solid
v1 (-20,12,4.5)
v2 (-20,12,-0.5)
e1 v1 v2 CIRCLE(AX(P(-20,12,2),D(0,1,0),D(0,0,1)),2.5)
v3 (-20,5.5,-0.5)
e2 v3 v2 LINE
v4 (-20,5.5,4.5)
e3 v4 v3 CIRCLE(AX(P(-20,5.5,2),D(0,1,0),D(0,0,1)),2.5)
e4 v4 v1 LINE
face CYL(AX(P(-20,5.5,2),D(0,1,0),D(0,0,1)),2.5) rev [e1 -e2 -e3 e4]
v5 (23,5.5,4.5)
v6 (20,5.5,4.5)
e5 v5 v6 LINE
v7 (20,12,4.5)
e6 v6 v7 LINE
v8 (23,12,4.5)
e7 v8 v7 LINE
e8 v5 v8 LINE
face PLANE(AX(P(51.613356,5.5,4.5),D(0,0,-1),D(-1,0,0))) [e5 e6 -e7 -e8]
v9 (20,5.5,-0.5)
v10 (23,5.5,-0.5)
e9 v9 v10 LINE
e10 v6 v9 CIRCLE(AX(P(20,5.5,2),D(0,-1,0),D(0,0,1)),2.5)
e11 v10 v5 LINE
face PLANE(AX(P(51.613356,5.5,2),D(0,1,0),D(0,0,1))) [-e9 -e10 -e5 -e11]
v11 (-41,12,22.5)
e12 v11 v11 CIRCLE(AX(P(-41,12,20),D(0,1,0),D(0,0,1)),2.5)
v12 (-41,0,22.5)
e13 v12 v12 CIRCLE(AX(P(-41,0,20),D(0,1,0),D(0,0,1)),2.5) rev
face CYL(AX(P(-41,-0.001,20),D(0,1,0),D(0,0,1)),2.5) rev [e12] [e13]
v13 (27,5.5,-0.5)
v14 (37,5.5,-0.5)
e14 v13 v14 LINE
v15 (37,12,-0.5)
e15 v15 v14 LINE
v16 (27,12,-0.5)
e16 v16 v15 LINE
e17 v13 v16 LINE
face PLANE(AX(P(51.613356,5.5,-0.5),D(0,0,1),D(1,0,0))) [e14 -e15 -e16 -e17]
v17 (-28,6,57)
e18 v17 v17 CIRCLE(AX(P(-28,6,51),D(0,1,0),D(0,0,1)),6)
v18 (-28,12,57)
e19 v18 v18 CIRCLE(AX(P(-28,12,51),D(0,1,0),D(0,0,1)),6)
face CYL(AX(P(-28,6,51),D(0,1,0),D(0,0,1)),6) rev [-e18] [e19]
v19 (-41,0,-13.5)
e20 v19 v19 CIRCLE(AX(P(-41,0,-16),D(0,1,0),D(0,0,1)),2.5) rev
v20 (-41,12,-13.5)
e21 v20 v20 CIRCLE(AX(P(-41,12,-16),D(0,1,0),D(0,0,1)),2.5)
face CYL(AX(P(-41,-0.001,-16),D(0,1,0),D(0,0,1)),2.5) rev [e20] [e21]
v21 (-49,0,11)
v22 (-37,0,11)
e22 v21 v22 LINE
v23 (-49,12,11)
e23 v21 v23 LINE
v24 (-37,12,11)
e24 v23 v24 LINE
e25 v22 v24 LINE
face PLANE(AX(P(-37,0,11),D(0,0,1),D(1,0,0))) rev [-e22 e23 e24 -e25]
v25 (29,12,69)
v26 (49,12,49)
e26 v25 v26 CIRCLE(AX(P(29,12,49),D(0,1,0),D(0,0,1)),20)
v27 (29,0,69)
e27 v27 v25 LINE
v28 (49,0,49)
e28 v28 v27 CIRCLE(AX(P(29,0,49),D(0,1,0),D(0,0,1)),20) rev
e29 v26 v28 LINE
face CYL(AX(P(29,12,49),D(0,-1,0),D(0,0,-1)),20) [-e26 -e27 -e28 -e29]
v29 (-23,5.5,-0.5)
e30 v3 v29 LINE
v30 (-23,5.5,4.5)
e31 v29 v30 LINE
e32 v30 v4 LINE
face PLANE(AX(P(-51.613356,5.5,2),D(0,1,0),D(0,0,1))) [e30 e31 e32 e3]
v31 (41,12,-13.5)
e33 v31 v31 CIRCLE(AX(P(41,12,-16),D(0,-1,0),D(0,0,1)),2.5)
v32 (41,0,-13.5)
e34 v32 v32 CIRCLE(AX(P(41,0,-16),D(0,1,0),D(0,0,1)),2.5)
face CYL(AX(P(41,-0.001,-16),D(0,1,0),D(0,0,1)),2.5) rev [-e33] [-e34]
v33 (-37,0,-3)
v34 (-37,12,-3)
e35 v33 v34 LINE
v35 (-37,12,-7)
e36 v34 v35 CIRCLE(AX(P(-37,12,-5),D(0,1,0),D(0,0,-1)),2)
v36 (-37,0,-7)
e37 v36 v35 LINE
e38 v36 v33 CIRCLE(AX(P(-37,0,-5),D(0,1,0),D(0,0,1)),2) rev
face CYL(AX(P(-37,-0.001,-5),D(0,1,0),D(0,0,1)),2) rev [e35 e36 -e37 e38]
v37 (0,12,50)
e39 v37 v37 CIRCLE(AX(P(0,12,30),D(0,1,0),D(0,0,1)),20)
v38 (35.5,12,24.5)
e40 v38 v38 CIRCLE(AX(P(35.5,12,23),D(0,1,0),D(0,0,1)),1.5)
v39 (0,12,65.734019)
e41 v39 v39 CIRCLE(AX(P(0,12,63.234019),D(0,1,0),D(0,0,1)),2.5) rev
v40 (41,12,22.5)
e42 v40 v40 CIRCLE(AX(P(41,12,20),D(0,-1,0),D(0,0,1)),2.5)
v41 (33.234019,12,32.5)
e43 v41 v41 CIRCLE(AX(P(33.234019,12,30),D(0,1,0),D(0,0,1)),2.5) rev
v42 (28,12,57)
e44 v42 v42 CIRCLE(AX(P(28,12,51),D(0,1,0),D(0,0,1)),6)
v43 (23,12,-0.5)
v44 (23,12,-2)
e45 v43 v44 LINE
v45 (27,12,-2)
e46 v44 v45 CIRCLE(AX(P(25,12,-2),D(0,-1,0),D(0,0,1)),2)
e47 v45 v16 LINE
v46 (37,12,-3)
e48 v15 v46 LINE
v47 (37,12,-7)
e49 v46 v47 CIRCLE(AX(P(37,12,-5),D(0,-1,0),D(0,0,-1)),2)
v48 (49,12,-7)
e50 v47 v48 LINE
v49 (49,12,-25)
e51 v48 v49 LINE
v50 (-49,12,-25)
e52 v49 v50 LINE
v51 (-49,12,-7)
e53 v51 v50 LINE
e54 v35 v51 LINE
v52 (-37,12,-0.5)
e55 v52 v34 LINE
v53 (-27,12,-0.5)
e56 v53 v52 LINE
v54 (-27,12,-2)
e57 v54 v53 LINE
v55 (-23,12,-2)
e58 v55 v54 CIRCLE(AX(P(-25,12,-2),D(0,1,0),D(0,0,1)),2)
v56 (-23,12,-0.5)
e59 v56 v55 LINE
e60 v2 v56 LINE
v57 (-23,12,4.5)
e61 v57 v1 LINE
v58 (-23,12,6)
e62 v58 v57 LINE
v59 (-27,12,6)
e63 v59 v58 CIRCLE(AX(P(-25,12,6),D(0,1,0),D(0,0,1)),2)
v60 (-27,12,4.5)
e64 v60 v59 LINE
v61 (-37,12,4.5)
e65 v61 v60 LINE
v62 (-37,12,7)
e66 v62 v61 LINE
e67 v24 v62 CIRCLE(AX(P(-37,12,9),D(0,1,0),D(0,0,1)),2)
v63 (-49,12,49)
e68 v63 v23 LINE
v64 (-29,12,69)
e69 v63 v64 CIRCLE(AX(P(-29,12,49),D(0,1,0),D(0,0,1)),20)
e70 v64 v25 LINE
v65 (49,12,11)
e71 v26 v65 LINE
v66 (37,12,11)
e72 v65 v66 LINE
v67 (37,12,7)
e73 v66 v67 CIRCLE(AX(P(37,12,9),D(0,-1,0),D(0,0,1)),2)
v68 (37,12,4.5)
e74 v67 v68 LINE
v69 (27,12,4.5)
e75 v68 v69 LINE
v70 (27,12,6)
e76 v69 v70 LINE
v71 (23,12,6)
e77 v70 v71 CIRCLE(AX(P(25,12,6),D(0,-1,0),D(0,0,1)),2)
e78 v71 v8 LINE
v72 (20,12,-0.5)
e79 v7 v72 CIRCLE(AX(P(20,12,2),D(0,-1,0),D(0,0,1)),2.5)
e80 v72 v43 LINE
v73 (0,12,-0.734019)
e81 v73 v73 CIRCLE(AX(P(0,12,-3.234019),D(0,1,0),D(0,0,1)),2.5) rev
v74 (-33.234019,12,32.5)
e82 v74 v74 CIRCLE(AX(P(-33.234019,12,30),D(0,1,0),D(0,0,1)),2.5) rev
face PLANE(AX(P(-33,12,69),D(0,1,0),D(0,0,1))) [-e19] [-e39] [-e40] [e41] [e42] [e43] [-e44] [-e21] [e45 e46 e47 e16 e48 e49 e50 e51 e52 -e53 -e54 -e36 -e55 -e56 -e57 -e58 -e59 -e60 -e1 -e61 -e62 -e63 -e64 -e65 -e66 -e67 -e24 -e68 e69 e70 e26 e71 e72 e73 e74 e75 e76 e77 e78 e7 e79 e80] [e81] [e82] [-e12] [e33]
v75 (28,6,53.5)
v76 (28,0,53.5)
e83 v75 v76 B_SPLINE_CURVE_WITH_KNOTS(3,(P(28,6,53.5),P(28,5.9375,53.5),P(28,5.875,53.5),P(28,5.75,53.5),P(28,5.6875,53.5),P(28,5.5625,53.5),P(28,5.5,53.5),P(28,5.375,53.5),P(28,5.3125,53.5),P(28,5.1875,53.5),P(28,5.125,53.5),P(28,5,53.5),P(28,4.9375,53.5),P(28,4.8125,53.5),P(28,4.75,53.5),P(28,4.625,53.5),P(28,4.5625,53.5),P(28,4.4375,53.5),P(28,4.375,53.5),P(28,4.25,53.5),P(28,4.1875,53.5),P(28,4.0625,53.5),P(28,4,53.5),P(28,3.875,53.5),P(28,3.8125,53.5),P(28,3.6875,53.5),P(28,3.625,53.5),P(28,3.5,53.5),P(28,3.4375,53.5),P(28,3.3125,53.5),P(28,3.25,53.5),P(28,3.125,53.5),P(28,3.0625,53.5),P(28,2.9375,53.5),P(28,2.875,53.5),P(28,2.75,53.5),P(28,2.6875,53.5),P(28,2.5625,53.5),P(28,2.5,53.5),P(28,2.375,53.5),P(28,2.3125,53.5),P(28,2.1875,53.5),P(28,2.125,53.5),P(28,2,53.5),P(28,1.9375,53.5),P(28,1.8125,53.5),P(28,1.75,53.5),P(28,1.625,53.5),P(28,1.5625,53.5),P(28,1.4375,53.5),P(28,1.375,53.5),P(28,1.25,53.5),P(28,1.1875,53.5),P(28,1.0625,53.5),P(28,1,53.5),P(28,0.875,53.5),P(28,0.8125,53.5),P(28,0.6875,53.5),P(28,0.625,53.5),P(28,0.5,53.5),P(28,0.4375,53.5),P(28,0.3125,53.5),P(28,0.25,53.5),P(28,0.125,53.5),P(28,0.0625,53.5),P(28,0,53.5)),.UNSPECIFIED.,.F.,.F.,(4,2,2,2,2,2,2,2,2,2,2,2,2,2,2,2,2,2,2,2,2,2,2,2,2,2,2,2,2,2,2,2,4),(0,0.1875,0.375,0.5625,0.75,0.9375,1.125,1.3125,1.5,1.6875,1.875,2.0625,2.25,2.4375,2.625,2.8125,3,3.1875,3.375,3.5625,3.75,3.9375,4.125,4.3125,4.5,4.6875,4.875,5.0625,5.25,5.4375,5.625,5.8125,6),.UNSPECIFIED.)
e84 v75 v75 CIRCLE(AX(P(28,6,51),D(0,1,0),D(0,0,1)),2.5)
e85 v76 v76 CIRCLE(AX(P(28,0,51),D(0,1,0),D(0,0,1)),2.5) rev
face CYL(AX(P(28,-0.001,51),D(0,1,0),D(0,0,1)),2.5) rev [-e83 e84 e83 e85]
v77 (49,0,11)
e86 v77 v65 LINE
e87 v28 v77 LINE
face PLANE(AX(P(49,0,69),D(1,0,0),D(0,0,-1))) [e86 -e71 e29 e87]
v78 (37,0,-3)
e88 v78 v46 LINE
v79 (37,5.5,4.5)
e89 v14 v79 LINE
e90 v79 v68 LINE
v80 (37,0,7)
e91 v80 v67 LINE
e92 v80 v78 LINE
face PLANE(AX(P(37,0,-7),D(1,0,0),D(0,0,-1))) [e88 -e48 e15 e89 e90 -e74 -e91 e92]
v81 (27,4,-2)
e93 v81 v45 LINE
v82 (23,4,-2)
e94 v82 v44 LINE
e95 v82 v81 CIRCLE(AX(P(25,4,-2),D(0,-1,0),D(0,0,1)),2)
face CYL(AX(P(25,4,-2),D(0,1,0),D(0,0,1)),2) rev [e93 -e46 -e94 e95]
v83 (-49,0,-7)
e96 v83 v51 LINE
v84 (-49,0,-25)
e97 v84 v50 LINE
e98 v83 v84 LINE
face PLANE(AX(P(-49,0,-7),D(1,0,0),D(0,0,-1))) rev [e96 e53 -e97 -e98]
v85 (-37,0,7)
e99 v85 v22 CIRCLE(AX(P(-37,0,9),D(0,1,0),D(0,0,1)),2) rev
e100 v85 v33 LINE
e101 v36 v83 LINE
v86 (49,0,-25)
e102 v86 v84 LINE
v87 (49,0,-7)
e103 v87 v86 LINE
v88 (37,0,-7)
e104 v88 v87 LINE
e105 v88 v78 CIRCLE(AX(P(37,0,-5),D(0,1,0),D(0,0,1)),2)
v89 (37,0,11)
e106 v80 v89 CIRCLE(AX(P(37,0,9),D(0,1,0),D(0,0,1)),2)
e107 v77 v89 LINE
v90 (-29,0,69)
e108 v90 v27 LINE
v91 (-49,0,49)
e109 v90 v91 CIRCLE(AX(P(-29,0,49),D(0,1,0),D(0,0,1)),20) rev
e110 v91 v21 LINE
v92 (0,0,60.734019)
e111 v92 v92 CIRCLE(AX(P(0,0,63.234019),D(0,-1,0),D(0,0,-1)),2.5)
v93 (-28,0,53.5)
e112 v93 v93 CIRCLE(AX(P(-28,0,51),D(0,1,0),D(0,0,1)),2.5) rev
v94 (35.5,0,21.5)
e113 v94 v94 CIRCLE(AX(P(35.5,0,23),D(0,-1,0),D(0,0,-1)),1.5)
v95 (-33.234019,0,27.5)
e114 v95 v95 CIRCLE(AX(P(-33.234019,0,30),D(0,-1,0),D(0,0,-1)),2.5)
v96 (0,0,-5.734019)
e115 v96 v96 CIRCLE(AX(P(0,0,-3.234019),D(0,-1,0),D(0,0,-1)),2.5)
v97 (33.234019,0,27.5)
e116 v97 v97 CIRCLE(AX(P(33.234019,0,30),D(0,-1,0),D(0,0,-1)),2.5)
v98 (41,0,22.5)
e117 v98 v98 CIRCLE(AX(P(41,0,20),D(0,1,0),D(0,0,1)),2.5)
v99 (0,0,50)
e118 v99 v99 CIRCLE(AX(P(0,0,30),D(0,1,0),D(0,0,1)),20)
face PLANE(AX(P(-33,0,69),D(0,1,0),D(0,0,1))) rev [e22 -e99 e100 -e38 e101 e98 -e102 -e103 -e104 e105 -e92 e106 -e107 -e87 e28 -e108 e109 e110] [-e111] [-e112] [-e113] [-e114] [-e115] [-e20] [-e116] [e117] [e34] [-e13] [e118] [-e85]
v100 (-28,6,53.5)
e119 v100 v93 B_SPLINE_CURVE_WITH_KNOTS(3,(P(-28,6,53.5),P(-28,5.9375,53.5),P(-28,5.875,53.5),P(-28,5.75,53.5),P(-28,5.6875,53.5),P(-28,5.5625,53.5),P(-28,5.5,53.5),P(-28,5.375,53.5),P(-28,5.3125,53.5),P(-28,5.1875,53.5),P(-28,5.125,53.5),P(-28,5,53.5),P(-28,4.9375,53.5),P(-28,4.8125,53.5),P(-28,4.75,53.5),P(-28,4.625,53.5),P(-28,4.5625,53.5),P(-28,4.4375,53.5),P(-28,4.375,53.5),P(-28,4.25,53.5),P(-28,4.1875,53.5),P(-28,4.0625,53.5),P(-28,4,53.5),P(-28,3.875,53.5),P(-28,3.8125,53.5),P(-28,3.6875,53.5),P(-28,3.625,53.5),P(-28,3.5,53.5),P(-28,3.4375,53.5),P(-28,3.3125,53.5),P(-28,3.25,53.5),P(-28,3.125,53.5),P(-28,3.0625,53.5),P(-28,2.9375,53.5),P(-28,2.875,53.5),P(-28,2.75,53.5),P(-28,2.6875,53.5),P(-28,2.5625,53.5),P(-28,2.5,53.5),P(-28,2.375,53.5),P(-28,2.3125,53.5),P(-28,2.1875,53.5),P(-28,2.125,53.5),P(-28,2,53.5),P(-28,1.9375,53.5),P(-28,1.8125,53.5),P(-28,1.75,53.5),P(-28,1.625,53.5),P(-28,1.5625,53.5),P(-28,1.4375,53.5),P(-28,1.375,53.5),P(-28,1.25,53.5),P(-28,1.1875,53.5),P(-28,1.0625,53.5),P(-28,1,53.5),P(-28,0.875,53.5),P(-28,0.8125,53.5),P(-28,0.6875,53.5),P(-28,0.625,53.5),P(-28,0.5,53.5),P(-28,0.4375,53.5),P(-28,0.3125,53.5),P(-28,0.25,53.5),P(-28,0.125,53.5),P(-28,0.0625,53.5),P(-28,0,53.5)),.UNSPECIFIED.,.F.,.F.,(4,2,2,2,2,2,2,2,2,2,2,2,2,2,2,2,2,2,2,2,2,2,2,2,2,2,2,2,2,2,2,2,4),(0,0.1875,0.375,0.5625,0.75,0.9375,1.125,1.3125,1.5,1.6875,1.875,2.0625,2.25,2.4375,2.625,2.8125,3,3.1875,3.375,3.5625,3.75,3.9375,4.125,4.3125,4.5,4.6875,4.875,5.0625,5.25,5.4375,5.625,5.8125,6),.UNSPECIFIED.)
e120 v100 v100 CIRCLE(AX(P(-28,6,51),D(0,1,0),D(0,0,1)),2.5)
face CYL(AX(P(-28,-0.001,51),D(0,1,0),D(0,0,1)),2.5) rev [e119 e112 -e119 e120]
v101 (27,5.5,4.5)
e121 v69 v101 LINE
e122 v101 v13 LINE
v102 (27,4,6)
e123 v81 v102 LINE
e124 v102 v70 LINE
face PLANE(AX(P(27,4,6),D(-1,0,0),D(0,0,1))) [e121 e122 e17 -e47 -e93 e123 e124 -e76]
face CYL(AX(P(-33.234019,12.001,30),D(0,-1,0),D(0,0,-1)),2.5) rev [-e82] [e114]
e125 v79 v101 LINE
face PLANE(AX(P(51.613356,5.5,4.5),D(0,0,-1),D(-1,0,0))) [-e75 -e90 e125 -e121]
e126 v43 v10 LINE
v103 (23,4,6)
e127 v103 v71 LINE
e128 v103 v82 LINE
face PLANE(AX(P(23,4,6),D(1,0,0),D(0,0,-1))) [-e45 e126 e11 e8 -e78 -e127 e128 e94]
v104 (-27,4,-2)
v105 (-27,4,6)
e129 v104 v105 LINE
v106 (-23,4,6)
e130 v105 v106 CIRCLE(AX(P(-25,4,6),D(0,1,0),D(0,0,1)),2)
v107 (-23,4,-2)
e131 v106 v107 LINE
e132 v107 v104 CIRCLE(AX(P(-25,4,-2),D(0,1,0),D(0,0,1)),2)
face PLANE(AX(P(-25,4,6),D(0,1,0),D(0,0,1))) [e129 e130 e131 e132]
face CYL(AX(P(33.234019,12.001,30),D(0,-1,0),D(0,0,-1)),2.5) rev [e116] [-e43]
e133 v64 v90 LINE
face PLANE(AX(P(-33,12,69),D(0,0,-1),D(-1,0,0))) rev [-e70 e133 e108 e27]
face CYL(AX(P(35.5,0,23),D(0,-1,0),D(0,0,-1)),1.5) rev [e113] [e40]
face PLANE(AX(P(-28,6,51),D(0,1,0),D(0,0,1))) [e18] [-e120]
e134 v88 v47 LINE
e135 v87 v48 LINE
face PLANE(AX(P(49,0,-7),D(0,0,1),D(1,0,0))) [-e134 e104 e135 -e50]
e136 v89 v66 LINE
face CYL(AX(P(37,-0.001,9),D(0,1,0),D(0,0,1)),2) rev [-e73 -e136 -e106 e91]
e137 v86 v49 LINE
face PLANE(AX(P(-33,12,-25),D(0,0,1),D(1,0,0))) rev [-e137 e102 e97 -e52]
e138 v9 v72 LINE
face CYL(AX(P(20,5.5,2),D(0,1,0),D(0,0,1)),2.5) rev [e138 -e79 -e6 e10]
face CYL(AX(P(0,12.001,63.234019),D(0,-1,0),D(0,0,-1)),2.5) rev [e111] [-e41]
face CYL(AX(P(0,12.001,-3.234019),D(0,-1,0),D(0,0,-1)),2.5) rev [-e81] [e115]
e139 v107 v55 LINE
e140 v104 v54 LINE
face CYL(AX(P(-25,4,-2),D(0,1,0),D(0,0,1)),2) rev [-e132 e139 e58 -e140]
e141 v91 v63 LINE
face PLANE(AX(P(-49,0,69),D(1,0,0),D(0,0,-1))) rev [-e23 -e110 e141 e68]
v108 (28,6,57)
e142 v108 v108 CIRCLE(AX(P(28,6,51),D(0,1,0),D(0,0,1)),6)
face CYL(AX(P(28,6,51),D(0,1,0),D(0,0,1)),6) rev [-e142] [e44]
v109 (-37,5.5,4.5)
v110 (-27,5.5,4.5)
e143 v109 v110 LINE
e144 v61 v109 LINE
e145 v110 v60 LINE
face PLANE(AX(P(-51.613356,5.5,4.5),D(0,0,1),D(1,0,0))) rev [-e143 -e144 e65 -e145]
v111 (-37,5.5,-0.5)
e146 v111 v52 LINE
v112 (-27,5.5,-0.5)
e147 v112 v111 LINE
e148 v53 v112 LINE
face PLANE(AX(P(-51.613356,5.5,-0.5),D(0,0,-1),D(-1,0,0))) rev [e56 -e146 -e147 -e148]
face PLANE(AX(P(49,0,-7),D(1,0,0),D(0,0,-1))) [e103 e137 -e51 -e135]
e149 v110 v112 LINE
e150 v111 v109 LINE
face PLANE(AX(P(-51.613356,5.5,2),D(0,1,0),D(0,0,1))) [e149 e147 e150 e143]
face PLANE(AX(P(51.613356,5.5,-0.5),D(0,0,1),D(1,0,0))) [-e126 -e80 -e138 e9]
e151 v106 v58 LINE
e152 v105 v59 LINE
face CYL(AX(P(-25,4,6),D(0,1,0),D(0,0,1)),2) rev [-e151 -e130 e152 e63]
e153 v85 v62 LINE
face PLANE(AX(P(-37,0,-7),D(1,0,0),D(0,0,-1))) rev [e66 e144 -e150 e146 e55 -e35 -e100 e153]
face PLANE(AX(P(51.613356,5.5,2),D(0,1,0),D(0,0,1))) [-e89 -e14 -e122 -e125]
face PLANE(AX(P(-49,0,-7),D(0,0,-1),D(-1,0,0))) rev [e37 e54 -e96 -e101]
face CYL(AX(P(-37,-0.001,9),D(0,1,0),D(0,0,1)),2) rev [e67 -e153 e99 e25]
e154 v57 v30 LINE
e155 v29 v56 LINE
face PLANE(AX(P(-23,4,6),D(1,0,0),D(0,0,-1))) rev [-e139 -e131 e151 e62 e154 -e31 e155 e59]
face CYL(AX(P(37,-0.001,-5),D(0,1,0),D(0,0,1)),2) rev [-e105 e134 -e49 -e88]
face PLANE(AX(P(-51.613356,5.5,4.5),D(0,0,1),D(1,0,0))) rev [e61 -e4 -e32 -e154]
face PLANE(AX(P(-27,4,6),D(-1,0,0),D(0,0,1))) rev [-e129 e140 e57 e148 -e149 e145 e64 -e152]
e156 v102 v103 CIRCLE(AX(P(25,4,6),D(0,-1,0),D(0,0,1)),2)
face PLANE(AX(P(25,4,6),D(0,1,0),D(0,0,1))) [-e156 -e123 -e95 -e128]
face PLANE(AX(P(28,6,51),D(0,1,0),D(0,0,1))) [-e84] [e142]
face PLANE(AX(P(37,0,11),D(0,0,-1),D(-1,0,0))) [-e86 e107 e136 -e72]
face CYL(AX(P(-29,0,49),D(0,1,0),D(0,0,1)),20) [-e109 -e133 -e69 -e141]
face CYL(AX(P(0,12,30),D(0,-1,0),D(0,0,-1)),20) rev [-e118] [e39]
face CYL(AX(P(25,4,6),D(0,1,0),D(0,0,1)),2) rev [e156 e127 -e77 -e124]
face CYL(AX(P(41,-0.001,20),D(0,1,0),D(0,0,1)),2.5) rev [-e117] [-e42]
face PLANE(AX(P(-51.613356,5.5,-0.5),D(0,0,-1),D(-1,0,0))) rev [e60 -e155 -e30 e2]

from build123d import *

# Parameters (mm, degrees)
SKETCH1_W                = 66
SKETCH1_H                = 94
SKETCH1_R                = 20
BOSS_EXTRUDE1_DEPTH      = 12
BOSS_EXTRUDE3_DEPTH      = 12
SKETCH6_R                = 6
CUT_EXTRUDE2_DEPTH       = 6
CUT_EXTRUDE3_REACH       = 87.475
SKETCH7_R                = 2.5
FILLET1_OUTLINE_R        = 2.5
FILLET1_OUTLINE_R_2      = 1.5
FILLET1_DEPTH            = 12
FILLET1_START            = 5.5
FILLET1_2_DEPTH          = 6.5
FILLET1_START_2          = 4
FILLET1_3_DEPTH          = 1.5
CUT_EXTRUDE9_OUTLINE_W   = 10
CUT_EXTRUDE9_OUTLINE_H   = 5
CUT_EXTRUDE9_OUTLINE_R   = 2.5
CUT_EXTRUDE9_OUTLINE_R_2 = 1.5
CUT_EXTRUDE9_DEPTH       = 12
CUT_EXTRUDE10_DEPTH      = 6.5
CUT_EXTRUDE11_REACH      = 87.475
MIRROR2_START            = 5.5
MIRROR2_OUTLINE_R        = 2.5
MIRROR2_DEPTH            = 6.5
MIRROR2_2_OUTLINE_R      = 2.5
MIRROR2_2_DEPTH          = 5.5
MIRROR2_START_2          = 4
MIRROR2_3_DEPTH          = 1.5
CUT_EXTRUDE6_REACH       = 87.475
SKETCH10_R               = 2.5
F_3_0_3_DIAMETER_HOLE1_D = 3
CUT_EXTRUDE12_START      = -7
CUT_EXTRUDE12_OUTLINE_R  = 2.5
CUT_EXTRUDE12_DEPTH      = 14


with BuildPart() as part:
    # Sketch1 → Boss-Extrude1 (new body)
    with BuildSketch(Plane(origin=(0, 0, 0), x_dir=(1, 0, 0), z_dir=(0, 1, 0))):
        with Locations((0, -22)):
            Rectangle(SKETCH1_W, SKETCH1_H)
        with Locations(Location((0, -30, 0), (0, 0, 270))):
            Circle(SKETCH1_R, mode=Mode.SUBTRACT)
    extrude(amount=BOSS_EXTRUDE1_DEPTH)

    # Sketch3 → Boss-Extrude3 (add)
    with BuildSketch(Plane(origin=(0, 12, 0), x_dir=(1, 0, 0), z_dir=(0, 1, 0))):
        Polygon((49, 7), (37, 7), (37, -11), (49, -11), (49, -69), (33, -69), (33, 25), (49, 25), align=None)
    boss_extrude3 = extrude(amount=-BOSS_EXTRUDE3_DEPTH)

    # Mirror1: Boss-Extrude3 across plane
    add(boss_extrude3.mirror(Plane(origin=(0, 0, 0), x_dir=(0, 0, 1), z_dir=(1, 0, 0))))

    # Sketch6 → Cut-Extrude2 (cut)
    with BuildSketch(Plane(origin=(0, 12, 0), x_dir=(1, 0, 0), z_dir=(0, 1, 0))):
        with Locations(Location((-28, -51, 0), (0, 0, 270))):
            Circle(SKETCH6_R)
        with Locations(Location((28, -51, 0), (0, 0, 270))):
            Circle(SKETCH6_R)
    extrude(amount=-CUT_EXTRUDE2_DEPTH, mode=Mode.SUBTRACT)

    # Sketch7 → Cut-Extrude3 (cut, up to next)
    with BuildSketch(Plane(origin=(0, 12, 0), x_dir=(1, 0, 0), z_dir=(0, 1, 0)), mode=Mode.PRIVATE) as cut_extrude3_sk1:
        with Locations(Location((-41, 16, 0), (0, 0, 270))):
            Circle(SKETCH7_R)
    cut_extrude3_tool1 = extrude(cut_extrude3_sk1.sketch, amount=-CUT_EXTRUDE3_REACH, mode=Mode.PRIVATE) & part.part
    # Sketch7 → Cut-Extrude3 (cut, up to next)
    with BuildSketch(Plane(origin=(0, 12, 0), x_dir=(1, 0, 0), z_dir=(0, 1, 0)), mode=Mode.PRIVATE) as cut_extrude3_sk2:
        with Locations(Location((-41, -20, 0), (0, 0, 270))):
            Circle(SKETCH7_R)
    cut_extrude3_tool2 = extrude(cut_extrude3_sk2.sketch, amount=-CUT_EXTRUDE3_REACH, mode=Mode.PRIVATE) & part.part
    add(cut_extrude3_tool1.solids().sort_by_distance((-41, 12, -16))[0], mode=Mode.SUBTRACT)
    add(cut_extrude3_tool2.solids().sort_by_distance((-41, 12, 20))[0], mode=Mode.SUBTRACT)

    # Fillet1: read off the stored shape, not the designer's step
    # Fillet1 outline → Fillet1 (cut)
    with BuildSketch(Plane(origin=(0, 0, 0), x_dir=(1, 0, 0), z_dir=(0, 1, 0))):
        with BuildLine():
            ThreePointArc((37, 7), (35, 5), (37, 3))
            Line((37, 3), (37, 7))
        make_face()
        with BuildLine():
            Line((37, -11), (37, -7))
            ThreePointArc((37, -7), (35, -9), (37, -11))
        make_face()
        with BuildLine():
            ThreePointArc((-37, -11), (-35, -9), (-37, -7))
            Line((-37, -7), (-37, -11))
        make_face()
        with BuildLine():
            Line((-37, 7), (-37, 3))
            ThreePointArc((-37, 3), (-35, 5), (-37, 7))
        make_face()
        with Locations((41, 16)):
            Circle(FILLET1_OUTLINE_R)
        with Locations((41, -20)):
            Circle(FILLET1_OUTLINE_R)
        with Locations((0, -63.234018716)):
            Circle(FILLET1_OUTLINE_R)
        with Locations((-33.234018716, -30)):
            Circle(FILLET1_OUTLINE_R)
        with Locations((0, 3.234018716)):
            Circle(FILLET1_OUTLINE_R)
        with Locations((33.234018716, -30)):
            Circle(FILLET1_OUTLINE_R)
        with Locations((35.5, -23)):
            Circle(FILLET1_OUTLINE_R_2)
        with BuildLine():
            Line((49, -69), (49, -49))
            ThreePointArc((49, -49), (43.142135624, -63.142135624), (29, -69))
            Line((29, -69), (49, -69))
        make_face()
        with BuildLine():
            Line((-49, -69), (-29, -69))
            ThreePointArc((-29, -69), (-43.142135624, -63.142135624), (-49, -49))
            Line((-49, -49), (-49, -69))
        make_face()
    extrude(amount=FILLET1_DEPTH, mode=Mode.SUBTRACT)

    # Fillet1 2 outline → Fillet1 2 (cut)
    with BuildSketch(Plane(origin=(0, 0, 0), x_dir=(1, 0, 0), z_dir=(0, 1, 0)).offset(FILLET1_START)):
        with BuildLine():
            Line((23, -4.5), (23, -6))
            ThreePointArc((23, -6), (25, -8), (27, -6))
            Line((27, -6), (27, -4.5))
            Line((27, -4.5), (37, -4.5))
            Line((37, -4.5), (37, 0.5))
            Line((37, 0.5), (27, 0.5))
            Line((27, 0.5), (27, 2))
            ThreePointArc((27, 2), (25, 4), (23, 2))
            Line((23, 2), (23, 0.5))
            Line((23, 0.5), (20, 0.5))
            ThreePointArc((20, 0.5), (17.5, -2), (20, -4.5))
            Line((20, -4.5), (23, -4.5))
        make_face()
        with BuildLine():
            Line((-27, -4.5), (-27, -6))
            ThreePointArc((-27, -6), (-25, -8), (-23, -6))
            Line((-23, -6), (-23, -4.5))
            Line((-23, -4.5), (-20, -4.5))
            ThreePointArc((-20, -4.5), (-17.5, -2), (-20, 0.5))
            Line((-20, 0.5), (-23, 0.5))
            Line((-23, 0.5), (-23, 2))
            ThreePointArc((-23, 2), (-25, 4), (-27, 2))
            Line((-27, 2), (-27, 0.5))
            Line((-27, 0.5), (-37, 0.5))
            Line((-37, 0.5), (-37, -4.5))
            Line((-37, -4.5), (-27, -4.5))
        make_face()
    extrude(amount=FILLET1_2_DEPTH, mode=Mode.SUBTRACT)

    # Fillet1 3 outline → Fillet1 3 (cut)
    with BuildSketch(Plane(origin=(0, 0, 0), x_dir=(1, 0, 0), z_dir=(0, 1, 0)).offset(FILLET1_START_2)):
        with BuildLine():
            Line((23, 2), (23, -6))
            ThreePointArc((23, -6), (25, -8), (27, -6))
            Line((27, -6), (27, 2))
            ThreePointArc((27, 2), (25, 4), (23, 2))
        make_face()
        with BuildLine():
            Line((-27, 2), (-27, -6))
            ThreePointArc((-27, -6), (-25, -8), (-23, -6))
            Line((-23, -6), (-23, 2))
            ThreePointArc((-23, 2), (-25, 4), (-27, 2))
        make_face()
    extrude(amount=FILLET1_3_DEPTH, mode=Mode.SUBTRACT)

    # Cut-Extrude9: read off the stored shape, not the designer's step
    # Cut-Extrude9 outline → Cut-Extrude9 (add)
    with BuildSketch(Plane(origin=(0, 0, 0), x_dir=(1, 0, 0), z_dir=(0, 1, 0))):
        with BuildLine():
            Line((-49, -69), (-29, -69))
            ThreePointArc((-29, -69), (-43.142135624, -63.142135624), (-49, -49))
            Line((-49, -49), (-49, -69))
        make_face()
        with BuildLine():
            Line((29, -69), (49, -69))
            Line((49, -69), (49, -49))
            ThreePointArc((49, -49), (43.142135624, -63.142135624), (29, -69))
        make_face()
        with BuildLine():
            ThreePointArc((37, -7), (35, -9), (37, -11))
            Line((37, -11), (37, -7))
        make_face()
        with BuildLine():
            ThreePointArc((37, 7), (35, 5), (37, 3))
            Line((37, 3), (37, 7))
        make_face()
        with BuildLine():
            Line((27, -4.5), (37, -4.5))
            Line((37, -4.5), (37, 0.5))
            Line((37, 0.5), (27, 0.5))
            Line((27, 0.5), (27, 2))
            ThreePointArc((27, 2), (25, 4), (23, 2))
            Line((23, 2), (23, 0.5))
            Line((23, 0.5), (20, 0.5))
            ThreePointArc((20, 0.5), (17.5, -2), (20, -4.5))
            Line((20, -4.5), (23, -4.5))
            Line((23, -4.5), (23, -6))
            ThreePointArc((23, -6), (25, -8), (27, -6))
            Line((27, -6), (27, -4.5))
        make_face()
        with BuildLine():
            Line((-37, 7), (-37, 3))
            ThreePointArc((-37, 3), (-35, 5), (-37, 7))
        make_face()
        with Locations((-32, -2)):
            Rectangle(CUT_EXTRUDE9_OUTLINE_W, CUT_EXTRUDE9_OUTLINE_H)
        with BuildLine():
            Line((-37, -7), (-37, -11))
            ThreePointArc((-37, -11), (-35, -9), (-37, -7))
        make_face()
        with BuildLine():
            Line((-23, 0.5), (-23, -4.5))
            Line((-23, -4.5), (-20, -4.5))
            ThreePointArc((-20, -4.5), (-17.5, -2), (-20, 0.5))
            Line((-20, 0.5), (-23, 0.5))
        make_face()
        with Locations((41, 16)):
            Circle(CUT_EXTRUDE9_OUTLINE_R)
        with Locations((41, -20)):
            Circle(CUT_EXTRUDE9_OUTLINE_R)
        with Locations((0, -63.234018716)):
            Circle(CUT_EXTRUDE9_OUTLINE_R)
        with Locations((-33.234018716, -30)):
            Circle(CUT_EXTRUDE9_OUTLINE_R)
        with Locations((0, 3.234018716)):
            Circle(CUT_EXTRUDE9_OUTLINE_R)
        with Locations((33.234018716, -30)):
            Circle(CUT_EXTRUDE9_OUTLINE_R)
        with Locations((35.5, -23)):
            Circle(CUT_EXTRUDE9_OUTLINE_R_2)
    extrude(amount=CUT_EXTRUDE9_DEPTH)

    # Sketch22 → Cut-Extrude10 (cut)
    with BuildSketch(Plane(origin=(-20.717175762, 12, 136.686953466), x_dir=(-1, 0, 0), z_dir=(0, 1, 0))):
        with BuildLine():
            Line((30.896180536, -137.186953466), (-0.717175762, -137.186953466))
            ThreePointArc((-0.717175762, -137.186953466), (-3.217175762, -134.686953466), (-0.717175762, -132.186953466))
            Line((-0.717175762, -132.186953466), (30.896180536, -132.186953466))
            ThreePointArc((30.896180536, -132.186953466), (33.396180536, -134.686953466), (30.896180536, -137.186953466))
        make_face()
    extrude(amount=-CUT_EXTRUDE10_DEPTH, mode=Mode.SUBTRACT)

    # Sketch23 → Cut-Extrude11 (cut, up to next)
    with BuildSketch(Plane(origin=(0, 12, 0), x_dir=(1, 0, 0), z_dir=(0, 1, 0)), mode=Mode.PRIVATE) as cut_extrude11_sk1:
        with BuildLine():
            Line((-37, 7), (-37, 3))
            ThreePointArc((-37, 3), (-35, 5), (-37, 7))
        make_face()
    cut_extrude11_tool1 = extrude(cut_extrude11_sk1.sketch, amount=-CUT_EXTRUDE11_REACH, mode=Mode.PRIVATE) & part.part
    # Sketch23 → Cut-Extrude11 (cut, up to next)
    with BuildSketch(Plane(origin=(0, 12, 0), x_dir=(1, 0, 0), z_dir=(0, 1, 0)), mode=Mode.PRIVATE) as cut_extrude11_sk2:
        with BuildLine():
            Line((-37, -7), (-37, -11))
            ThreePointArc((-37, -11), (-35, -9), (-37, -7))
        make_face()
    cut_extrude11_tool2 = extrude(cut_extrude11_sk2.sketch, amount=-CUT_EXTRUDE11_REACH, mode=Mode.PRIVATE) & part.part
    add(cut_extrude11_tool1.solids().sort_by_distance((-36.151174, 12, -5))[0], mode=Mode.SUBTRACT)
    add(cut_extrude11_tool2.solids().sort_by_distance((-36.151174, 12, 9))[0], mode=Mode.SUBTRACT)

    # Mirror2: read off the stored shape, not the designer's step
    # Mirror2 outline → Mirror2 (cut)
    with BuildSketch(Plane(origin=(0, 0, 0), x_dir=(1, 0, 0), z_dir=(0, 1, 0)).offset(MIRROR2_START)):
        with BuildLine():
            ThreePointArc((37, 7), (35, 5), (37, 3))
            Line((37, 3), (37, 7))
        make_face()
        with BuildLine():
            Line((37, -11), (37, -7))
            ThreePointArc((37, -7), (35, -9), (37, -11))
        make_face()
        with BuildLine():
            Line((23, -4.5), (23, -6))
            ThreePointArc((23, -6), (25, -8), (27, -6))
            Line((27, -6), (27, -4.5))
            Line((27, -4.5), (37, -4.5))
            Line((37, -4.5), (37, 0.5))
            Line((37, 0.5), (27, 0.5))
            Line((27, 0.5), (27, 2))
            ThreePointArc((27, 2), (25, 4), (23, 2))
            Line((23, 2), (23, 0.5))
            Line((23, 0.5), (20, 0.5))
            ThreePointArc((20, 0.5), (17.5, -2), (20, -4.5))
            Line((20, -4.5), (23, -4.5))
        make_face()
        with Locations((41, 16)):
            Circle(MIRROR2_OUTLINE_R)
        with Locations((41, -20)):
            Circle(MIRROR2_OUTLINE_R)
    extrude(amount=MIRROR2_DEPTH, mode=Mode.SUBTRACT)

    # Mirror2 2 outline → Mirror2 2 (cut)
    with BuildSketch(Plane(origin=(0, 0, 0), x_dir=(1, 0, 0), z_dir=(0, 1, 0))):
        with BuildLine():
            ThreePointArc((37, 7), (35, 5), (37, 3))
            Line((37, 3), (37, 7))
        make_face()
        with BuildLine():
            Line((37, -11), (37, -7))
            ThreePointArc((37, -7), (35, -9), (37, -11))
        make_face()
        with Locations((41, 16)):
            Circle(MIRROR2_2_OUTLINE_R)
        with Locations((41, -20)):
            Circle(MIRROR2_2_OUTLINE_R)
    extrude(amount=MIRROR2_2_DEPTH, mode=Mode.SUBTRACT)

    # Mirror2 3 outline → Mirror2 3 (cut)
    with BuildSketch(Plane(origin=(0, 0, 0), x_dir=(1, 0, 0), z_dir=(0, 1, 0)).offset(MIRROR2_START_2)):
        with BuildLine():
            Line((23, 2), (23, -6))
            ThreePointArc((23, -6), (25, -8), (27, -6))
            Line((27, -6), (27, 2))
            ThreePointArc((27, 2), (25, 4), (23, 2))
        make_face()
    extrude(amount=MIRROR2_3_DEPTH, mode=Mode.SUBTRACT)

    # Sketch10 → Cut-Extrude6 (cut, up to next)
    with BuildSketch(Plane.XZ, mode=Mode.PRIVATE) as cut_extrude6_sk1:
        with Locations(Location((0, 63.234018716, 0), (0, 0, 270))):
            Circle(SKETCH10_R)
    cut_extrude6_tool1 = extrude(cut_extrude6_sk1.sketch, amount=-CUT_EXTRUDE6_REACH, mode=Mode.PRIVATE) & part.part
    # Sketch10 → Cut-Extrude6 (cut, up to next)
    with BuildSketch(Plane.XZ, mode=Mode.PRIVATE) as cut_extrude6_sk2:
        with Locations(Location((-33.234018716, 30, 0), (0, 0, 270))):
            Circle(SKETCH10_R)
    cut_extrude6_tool2 = extrude(cut_extrude6_sk2.sketch, amount=-CUT_EXTRUDE6_REACH, mode=Mode.PRIVATE) & part.part
    # Sketch10 → Cut-Extrude6 (cut, up to next)
    with BuildSketch(Plane.XZ, mode=Mode.PRIVATE) as cut_extrude6_sk3:
        with Locations(Location((0, -3.234018716, 0), (0, 0, 270))):
            Circle(SKETCH10_R)
    cut_extrude6_tool3 = extrude(cut_extrude6_sk3.sketch, amount=-CUT_EXTRUDE6_REACH, mode=Mode.PRIVATE) & part.part
    # Sketch10 → Cut-Extrude6 (cut, up to next)
    with BuildSketch(Plane.XZ, mode=Mode.PRIVATE) as cut_extrude6_sk4:
        with Locations(Location((33.234018716, 30, 0), (0, 0, 270))):
            Circle(SKETCH10_R)
    cut_extrude6_tool4 = extrude(cut_extrude6_sk4.sketch, amount=-CUT_EXTRUDE6_REACH, mode=Mode.PRIVATE) & part.part
    add(cut_extrude6_tool1.solids().sort_by_distance((0, 0, 63.234019))[0], mode=Mode.SUBTRACT)
    add(cut_extrude6_tool2.solids().sort_by_distance((-33.234019, 0, 30))[0], mode=Mode.SUBTRACT)
    add(cut_extrude6_tool3.solids().sort_by_distance((0, 0, -3.234019))[0], mode=Mode.SUBTRACT)
    add(cut_extrude6_tool4.solids().sort_by_distance((33.234019, 0, 30))[0], mode=Mode.SUBTRACT)

    # Ø3.0 (3) Diameter Hole1 (through all)
    with Locations(Plane.XZ):
        with Locations((35.5, 23)):
            Hole(F_3_0_3_DIAMETER_HOLE1_D / 2)

    # Cut-Extrude12: read off the stored shape, not the designer's step
    # Cut-Extrude12 outline → Cut-Extrude12 (cut)
    with BuildSketch(Plane(origin=(0, 6, 0), x_dir=(1, 0, 0), z_dir=(0, 1, 0)).offset(CUT_EXTRUDE12_START)):
        with BuildLine():
            Line((49, -69), (49, -49))
            ThreePointArc((49, -49), (43.142135624, -63.142135624), (29, -69))
            Line((29, -69), (49, -69))
        make_face()
        with BuildLine():
            Line((-49, -69), (-29, -69))
            ThreePointArc((-29, -69), (-43.142135624, -63.142135624), (-49, -49))
            Line((-49, -49), (-49, -69))
        make_face()
        with Locations((28, -51)):
            Circle(CUT_EXTRUDE12_OUTLINE_R)
        with Locations((-28, -51)):
            Circle(CUT_EXTRUDE12_OUTLINE_R)
    extrude(amount=CUT_EXTRUDE12_DEPTH, mode=Mode.SUBTRACT)


solid = part.part
